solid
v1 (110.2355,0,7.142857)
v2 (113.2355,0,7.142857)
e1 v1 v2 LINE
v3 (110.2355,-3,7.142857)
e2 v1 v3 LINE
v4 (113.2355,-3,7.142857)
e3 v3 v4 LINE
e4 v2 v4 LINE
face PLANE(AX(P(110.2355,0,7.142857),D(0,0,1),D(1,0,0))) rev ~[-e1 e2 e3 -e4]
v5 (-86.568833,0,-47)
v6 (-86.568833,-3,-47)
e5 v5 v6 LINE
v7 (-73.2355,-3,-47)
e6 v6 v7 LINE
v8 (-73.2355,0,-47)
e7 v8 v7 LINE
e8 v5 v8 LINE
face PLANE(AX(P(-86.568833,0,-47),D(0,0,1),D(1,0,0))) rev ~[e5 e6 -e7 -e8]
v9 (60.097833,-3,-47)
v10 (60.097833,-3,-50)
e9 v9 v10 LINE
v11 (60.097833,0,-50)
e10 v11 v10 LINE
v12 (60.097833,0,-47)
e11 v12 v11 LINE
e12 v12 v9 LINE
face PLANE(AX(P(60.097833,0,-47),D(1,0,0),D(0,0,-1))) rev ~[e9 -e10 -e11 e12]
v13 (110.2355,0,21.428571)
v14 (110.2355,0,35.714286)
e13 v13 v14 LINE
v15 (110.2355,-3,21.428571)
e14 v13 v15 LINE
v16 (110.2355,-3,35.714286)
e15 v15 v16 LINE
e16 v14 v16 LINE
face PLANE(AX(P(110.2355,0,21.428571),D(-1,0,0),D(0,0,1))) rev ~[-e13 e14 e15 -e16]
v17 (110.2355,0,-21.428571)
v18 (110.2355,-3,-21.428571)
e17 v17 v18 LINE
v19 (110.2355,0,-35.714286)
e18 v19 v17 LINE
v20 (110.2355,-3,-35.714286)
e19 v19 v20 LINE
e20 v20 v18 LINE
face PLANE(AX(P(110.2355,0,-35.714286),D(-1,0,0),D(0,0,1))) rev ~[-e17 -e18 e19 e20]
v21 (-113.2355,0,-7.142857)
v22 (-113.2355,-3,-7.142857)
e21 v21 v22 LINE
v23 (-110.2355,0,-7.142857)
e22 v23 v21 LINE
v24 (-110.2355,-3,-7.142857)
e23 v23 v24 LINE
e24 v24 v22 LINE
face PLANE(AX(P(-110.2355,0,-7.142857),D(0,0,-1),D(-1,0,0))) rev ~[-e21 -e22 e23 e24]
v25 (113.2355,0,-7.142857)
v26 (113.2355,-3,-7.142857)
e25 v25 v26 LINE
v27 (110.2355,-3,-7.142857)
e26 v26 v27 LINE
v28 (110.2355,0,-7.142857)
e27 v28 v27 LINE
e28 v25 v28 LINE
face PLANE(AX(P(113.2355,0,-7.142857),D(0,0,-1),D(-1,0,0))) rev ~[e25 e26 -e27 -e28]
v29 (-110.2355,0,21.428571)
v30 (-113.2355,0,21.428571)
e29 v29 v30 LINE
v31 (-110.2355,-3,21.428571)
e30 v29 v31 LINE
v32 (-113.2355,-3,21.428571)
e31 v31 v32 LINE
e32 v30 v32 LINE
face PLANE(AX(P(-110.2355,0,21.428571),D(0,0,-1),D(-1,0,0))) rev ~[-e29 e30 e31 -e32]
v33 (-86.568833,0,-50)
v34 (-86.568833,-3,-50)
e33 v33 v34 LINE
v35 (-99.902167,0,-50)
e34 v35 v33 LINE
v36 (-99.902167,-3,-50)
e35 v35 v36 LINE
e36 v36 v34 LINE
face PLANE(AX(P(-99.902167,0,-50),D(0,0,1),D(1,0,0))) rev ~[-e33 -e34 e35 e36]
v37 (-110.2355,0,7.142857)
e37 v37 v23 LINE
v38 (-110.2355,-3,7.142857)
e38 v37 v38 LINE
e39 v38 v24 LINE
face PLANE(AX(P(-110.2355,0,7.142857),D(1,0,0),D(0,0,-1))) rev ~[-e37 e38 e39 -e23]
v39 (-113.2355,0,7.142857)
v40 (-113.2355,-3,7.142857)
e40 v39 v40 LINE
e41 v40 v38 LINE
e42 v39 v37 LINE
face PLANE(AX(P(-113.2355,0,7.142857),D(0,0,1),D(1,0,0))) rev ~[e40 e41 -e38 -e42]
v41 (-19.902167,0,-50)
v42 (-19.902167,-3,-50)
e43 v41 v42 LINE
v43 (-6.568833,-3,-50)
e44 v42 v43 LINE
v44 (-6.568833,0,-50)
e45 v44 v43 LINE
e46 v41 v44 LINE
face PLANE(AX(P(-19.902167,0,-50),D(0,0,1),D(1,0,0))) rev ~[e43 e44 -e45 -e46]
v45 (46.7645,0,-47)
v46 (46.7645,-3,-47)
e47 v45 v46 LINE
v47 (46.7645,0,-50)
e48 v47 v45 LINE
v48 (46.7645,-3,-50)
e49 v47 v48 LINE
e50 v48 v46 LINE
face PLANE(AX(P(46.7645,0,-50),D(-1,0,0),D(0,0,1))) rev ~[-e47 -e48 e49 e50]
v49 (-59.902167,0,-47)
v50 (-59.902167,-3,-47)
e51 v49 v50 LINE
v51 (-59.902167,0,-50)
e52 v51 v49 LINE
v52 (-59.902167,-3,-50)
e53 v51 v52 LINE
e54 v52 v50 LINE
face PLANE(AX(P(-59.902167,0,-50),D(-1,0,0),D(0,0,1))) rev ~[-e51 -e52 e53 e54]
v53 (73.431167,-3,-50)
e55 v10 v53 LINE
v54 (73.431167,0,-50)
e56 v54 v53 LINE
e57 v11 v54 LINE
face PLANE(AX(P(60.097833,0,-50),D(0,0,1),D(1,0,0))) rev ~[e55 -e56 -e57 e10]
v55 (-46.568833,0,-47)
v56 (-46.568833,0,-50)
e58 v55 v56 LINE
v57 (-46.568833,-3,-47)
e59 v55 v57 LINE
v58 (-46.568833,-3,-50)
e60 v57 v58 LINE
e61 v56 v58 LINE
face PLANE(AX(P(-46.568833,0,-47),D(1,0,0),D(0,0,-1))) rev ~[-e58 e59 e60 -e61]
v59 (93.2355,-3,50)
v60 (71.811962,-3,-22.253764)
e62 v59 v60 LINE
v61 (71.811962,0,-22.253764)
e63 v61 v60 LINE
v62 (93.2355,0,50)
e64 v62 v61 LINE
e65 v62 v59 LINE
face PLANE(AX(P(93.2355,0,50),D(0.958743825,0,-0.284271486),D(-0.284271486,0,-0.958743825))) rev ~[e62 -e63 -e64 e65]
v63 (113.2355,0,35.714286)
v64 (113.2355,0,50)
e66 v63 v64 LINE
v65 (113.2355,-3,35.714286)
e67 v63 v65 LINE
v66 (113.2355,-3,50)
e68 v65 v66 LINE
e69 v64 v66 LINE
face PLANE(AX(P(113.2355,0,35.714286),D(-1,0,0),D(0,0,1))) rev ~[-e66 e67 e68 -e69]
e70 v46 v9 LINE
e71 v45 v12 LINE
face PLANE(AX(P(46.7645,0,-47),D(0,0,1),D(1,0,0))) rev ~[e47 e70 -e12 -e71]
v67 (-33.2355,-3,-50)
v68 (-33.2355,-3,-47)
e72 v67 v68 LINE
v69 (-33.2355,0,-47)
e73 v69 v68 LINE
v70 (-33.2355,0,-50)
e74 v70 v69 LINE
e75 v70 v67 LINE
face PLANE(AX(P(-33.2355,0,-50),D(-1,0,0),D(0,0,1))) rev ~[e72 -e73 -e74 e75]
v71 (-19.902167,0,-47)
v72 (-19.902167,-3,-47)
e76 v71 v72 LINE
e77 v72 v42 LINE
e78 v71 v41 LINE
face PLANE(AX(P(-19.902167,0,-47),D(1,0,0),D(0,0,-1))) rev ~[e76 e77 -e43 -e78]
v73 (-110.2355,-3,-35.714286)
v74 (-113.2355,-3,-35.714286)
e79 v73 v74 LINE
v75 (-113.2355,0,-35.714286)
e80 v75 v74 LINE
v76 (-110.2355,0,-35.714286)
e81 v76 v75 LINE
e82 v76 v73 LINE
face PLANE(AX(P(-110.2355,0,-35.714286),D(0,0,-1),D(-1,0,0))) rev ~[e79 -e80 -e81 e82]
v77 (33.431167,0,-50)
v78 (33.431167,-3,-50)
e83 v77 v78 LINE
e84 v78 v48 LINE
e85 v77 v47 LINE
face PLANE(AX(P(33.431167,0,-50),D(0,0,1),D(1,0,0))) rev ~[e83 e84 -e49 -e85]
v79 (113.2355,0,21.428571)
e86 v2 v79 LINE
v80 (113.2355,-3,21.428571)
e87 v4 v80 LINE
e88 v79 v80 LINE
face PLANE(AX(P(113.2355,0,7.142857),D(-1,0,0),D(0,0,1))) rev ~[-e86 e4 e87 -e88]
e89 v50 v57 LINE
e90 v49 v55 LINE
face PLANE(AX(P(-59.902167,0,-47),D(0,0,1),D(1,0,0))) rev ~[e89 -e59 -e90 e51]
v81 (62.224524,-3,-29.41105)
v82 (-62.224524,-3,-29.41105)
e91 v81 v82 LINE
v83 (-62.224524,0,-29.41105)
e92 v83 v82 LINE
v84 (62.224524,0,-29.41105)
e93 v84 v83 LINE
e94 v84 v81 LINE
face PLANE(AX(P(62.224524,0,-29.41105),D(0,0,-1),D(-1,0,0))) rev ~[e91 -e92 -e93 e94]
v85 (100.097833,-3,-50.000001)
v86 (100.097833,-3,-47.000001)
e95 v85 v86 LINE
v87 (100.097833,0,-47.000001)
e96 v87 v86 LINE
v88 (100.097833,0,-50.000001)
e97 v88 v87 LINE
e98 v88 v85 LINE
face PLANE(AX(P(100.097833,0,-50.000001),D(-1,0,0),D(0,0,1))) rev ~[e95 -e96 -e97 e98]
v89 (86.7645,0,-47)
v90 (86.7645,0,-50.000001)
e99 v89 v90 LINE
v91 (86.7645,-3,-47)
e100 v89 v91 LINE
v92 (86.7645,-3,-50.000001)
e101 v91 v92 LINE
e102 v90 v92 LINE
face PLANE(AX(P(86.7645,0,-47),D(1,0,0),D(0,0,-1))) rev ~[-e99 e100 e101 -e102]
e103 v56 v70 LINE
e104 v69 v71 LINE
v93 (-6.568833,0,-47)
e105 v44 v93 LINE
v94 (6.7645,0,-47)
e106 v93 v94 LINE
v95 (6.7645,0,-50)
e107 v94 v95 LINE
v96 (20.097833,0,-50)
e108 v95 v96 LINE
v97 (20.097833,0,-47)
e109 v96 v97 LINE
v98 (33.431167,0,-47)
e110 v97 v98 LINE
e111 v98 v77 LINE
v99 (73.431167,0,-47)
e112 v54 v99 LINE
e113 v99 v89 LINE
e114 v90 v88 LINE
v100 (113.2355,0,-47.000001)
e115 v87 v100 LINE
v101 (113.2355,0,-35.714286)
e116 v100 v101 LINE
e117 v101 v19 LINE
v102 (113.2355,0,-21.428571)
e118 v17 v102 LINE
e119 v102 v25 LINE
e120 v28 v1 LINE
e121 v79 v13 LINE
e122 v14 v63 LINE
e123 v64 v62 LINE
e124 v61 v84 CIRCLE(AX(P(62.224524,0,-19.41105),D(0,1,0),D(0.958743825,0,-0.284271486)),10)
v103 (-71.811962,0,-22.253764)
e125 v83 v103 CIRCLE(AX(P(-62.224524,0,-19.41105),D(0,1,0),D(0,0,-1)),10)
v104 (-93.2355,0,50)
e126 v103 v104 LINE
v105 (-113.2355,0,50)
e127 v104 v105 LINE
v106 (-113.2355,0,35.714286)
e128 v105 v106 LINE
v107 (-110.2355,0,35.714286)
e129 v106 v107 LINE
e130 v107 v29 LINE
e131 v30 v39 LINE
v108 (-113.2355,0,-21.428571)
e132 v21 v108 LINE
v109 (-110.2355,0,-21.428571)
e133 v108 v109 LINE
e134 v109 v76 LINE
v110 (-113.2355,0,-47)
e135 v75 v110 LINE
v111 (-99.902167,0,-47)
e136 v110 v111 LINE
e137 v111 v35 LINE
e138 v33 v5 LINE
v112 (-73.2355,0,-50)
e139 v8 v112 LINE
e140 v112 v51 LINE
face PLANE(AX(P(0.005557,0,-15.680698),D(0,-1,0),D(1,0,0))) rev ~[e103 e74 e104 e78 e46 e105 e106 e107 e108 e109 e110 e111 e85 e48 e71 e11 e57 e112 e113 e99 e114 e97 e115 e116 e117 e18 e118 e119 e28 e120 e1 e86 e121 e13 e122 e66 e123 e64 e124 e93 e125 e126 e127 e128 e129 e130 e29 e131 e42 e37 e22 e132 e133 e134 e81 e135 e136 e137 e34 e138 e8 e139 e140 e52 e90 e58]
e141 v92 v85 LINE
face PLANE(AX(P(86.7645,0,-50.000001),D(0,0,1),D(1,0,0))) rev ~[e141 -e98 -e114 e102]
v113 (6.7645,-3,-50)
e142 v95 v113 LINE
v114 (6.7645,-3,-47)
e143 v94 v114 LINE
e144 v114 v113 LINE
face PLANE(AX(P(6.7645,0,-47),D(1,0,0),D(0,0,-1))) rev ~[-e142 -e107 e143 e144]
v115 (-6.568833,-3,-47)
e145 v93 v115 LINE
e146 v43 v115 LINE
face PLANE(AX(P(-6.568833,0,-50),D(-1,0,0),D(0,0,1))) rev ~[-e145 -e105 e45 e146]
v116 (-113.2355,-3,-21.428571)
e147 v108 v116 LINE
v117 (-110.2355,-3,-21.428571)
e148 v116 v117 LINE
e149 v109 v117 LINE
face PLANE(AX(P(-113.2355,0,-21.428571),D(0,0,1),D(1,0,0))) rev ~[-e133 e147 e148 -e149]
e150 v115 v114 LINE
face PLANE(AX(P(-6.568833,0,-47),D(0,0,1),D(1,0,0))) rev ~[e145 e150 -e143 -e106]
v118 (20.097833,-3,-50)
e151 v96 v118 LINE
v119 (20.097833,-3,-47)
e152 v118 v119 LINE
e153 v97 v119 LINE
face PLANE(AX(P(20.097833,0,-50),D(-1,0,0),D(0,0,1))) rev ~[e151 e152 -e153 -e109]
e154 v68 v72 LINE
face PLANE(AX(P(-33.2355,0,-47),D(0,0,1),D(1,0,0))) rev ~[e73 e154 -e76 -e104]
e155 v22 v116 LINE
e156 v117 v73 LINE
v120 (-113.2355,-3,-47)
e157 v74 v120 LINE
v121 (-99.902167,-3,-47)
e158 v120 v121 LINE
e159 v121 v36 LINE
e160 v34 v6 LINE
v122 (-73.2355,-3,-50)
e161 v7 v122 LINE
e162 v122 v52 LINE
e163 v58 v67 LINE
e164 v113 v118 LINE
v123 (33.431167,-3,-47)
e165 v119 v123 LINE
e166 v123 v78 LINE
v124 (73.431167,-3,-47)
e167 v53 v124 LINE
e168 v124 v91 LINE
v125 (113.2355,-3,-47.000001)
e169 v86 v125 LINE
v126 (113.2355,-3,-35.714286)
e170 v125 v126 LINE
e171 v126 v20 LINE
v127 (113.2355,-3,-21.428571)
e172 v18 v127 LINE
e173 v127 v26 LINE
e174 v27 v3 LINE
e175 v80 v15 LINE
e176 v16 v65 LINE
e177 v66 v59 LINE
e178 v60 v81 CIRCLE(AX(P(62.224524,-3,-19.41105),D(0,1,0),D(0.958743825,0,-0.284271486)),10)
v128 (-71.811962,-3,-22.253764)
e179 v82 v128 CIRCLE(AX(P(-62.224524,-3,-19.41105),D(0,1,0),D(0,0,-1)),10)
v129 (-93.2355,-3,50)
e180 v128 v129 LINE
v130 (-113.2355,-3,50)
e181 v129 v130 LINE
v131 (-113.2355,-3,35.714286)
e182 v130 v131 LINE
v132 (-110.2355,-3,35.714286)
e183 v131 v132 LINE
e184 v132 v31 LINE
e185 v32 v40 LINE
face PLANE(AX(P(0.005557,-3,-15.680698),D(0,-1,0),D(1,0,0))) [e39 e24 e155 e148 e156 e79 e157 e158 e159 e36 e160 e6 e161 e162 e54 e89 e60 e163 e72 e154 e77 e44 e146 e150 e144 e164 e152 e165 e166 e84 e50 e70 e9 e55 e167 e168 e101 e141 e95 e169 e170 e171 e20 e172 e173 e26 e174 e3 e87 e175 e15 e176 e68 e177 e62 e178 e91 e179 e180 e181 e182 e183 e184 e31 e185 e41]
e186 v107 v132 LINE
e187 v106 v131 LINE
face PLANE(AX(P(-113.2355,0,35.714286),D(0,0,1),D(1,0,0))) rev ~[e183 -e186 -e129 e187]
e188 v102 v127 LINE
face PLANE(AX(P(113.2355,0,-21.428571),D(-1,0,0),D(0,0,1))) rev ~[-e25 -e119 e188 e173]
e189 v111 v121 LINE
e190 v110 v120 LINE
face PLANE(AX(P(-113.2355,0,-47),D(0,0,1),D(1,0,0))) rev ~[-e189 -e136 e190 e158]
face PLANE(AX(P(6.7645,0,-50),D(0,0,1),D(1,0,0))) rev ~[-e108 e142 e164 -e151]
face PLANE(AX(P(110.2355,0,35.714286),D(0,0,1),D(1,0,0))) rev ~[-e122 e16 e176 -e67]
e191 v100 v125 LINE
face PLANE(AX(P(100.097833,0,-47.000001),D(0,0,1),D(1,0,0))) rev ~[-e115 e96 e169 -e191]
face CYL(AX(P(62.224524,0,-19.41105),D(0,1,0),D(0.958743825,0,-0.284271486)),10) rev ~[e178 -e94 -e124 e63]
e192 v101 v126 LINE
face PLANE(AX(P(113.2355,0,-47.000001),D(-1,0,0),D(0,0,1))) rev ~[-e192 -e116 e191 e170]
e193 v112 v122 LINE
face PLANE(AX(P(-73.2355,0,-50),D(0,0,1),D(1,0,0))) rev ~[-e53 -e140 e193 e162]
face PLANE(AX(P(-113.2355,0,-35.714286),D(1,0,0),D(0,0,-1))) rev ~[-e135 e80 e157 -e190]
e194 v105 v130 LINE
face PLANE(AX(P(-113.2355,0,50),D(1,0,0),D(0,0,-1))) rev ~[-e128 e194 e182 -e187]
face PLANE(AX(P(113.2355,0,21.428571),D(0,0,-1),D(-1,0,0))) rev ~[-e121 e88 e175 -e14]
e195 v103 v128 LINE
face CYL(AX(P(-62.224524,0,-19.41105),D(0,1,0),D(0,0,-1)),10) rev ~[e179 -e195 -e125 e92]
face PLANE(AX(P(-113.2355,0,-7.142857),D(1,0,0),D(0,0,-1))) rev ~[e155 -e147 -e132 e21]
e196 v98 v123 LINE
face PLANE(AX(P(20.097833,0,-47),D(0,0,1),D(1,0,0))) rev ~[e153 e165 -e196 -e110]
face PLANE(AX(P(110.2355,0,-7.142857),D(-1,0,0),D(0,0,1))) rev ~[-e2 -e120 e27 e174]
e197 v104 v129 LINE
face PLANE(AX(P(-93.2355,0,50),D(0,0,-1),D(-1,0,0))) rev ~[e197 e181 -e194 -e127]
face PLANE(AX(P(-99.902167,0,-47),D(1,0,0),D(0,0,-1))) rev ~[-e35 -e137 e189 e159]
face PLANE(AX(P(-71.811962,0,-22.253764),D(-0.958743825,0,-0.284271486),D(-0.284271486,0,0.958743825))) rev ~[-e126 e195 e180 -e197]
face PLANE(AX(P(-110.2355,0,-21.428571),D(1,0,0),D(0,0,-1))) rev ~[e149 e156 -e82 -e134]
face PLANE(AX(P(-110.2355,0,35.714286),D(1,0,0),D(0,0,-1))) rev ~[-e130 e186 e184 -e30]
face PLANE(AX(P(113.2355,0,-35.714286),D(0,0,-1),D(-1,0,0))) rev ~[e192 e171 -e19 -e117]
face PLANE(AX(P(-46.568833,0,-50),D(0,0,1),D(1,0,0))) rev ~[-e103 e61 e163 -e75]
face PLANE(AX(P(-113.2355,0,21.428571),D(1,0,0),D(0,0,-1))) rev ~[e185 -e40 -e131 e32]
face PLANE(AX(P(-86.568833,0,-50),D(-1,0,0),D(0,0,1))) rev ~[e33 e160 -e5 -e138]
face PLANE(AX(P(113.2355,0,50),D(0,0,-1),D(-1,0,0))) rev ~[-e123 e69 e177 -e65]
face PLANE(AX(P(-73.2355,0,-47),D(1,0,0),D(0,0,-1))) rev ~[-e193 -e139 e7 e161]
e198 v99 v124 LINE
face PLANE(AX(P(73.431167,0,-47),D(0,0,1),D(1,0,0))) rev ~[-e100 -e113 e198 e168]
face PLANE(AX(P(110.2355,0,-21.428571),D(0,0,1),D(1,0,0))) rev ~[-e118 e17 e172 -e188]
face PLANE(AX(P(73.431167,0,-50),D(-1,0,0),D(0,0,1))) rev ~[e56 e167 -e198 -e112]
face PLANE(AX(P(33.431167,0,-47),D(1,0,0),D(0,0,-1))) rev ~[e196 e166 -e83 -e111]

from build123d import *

# Parameters (mm, degrees)
F1_DEPTH = 3


# Not quite as in the source:
# - ends of sketch curves that miss each other by under 0.0002 mm in the source are joined


with BuildPart() as f1:
    # F0 (on Front) → F1 (new body)
    with BuildSketch(Plane.XZ):
        with BuildLine():
            Line((60.097833329, -50), (73.431166662, -50))
            Line((73.431166662, -50), (73.431166662, -47))
            Line((73.431166662, -47), (86.7645, -47))
            Line((86.7645, -47), (86.7645, -50.0000007451))
            Line((86.7645, -50.0000007451), (100.097833333, -50.0000007451))
            Line((100.097833333, -50.0000007451), (100.097833333, -47.0000007451))
            Line((100.097833333, -47.0000007451), (113.2355, -47.0000007451))
            Line((113.2355, -47.0000007451), (113.2355, -35.714285716))
            Line((113.2355, -35.714285716), (110.2355, -35.714285716))
            Line((110.2355, -35.714285716), (110.2355, -21.42857143))
            Line((110.2355, -21.42857143), (113.2355, -21.42857143))
            Line((113.2355, -21.42857143), (113.2355, -7.142857144))
            Line((113.2355, -7.142857144), (110.2355, -7.142857144))
            Line((110.2355, -7.142857144), (110.2355, 7.142857142))
            Line((110.2355, 7.142857142), (113.2355, 7.142857142))
            Line((113.2355, 7.142857142), (113.2355, 21.428571428))
            Line((113.2355, 21.428571428), (110.2355, 21.428571428))
            Line((110.2355, 21.428571428), (110.2355, 35.714285714))
            Line((110.2355, 35.714285714), (113.2355, 35.714285714))
            Line((113.2355, 35.714285714), (113.2355, 50))
            Line((113.2355, 50), (93.2355, 50))
            Line((93.2355, 50), (71.8119617716, -22.2537644208))
            ThreePointArc((71.8119617716, -22.2537644208), (68.2066991862, -27.4243868361), (62.2245235205, -29.4110495597))
            Line((62.2245235205, -29.4110495597), (0, -29.4110495597))
            Line((0, -29.4110495597), (-62.2245235205, -29.4110495597))
            ThreePointArc((-62.2245235205, -29.4110495597), (-68.2066991862, -27.4243868361), (-71.8119617716, -22.2537644208))
            Line((-71.8119617716, -22.2537644208), (-93.2355, 50))
            Line((-93.2355, 50), (-113.2355, 50))
            Line((-113.2355, 50), (-113.2355, 35.714285714))
            Line((-113.2355, 35.714285714), (-110.2355, 35.714285714))
            Line((-110.2355, 35.714285714), (-110.2355, 21.428571428))
            Line((-110.2355, 21.428571428), (-113.2355, 21.428571428))
            Line((-113.2355, 21.428571428), (-113.2355, 7.142857142))
            Line((-113.2355, 7.142857142), (-110.2355, 7.142857142))
            Line((-110.2355, 7.142857142), (-110.2355, -7.142857144))
            Line((-110.2355, -7.142857144), (-113.2355, -7.142857144))
            Line((-113.2355, -7.142857144), (-113.2355, -21.42857143))
            Line((-113.2355, -21.42857143), (-110.2355, -21.42857143))
            Line((-110.2355, -21.42857143), (-110.2355, -35.714285716))
            Line((-110.2355, -35.714285716), (-113.2355, -35.714285716))
            Line((-113.2355, -35.714285716), (-113.2355, -47))
            Line((-113.2355, -47), (-99.902166667, -47))
            Line((-99.902166667, -47), (-99.902166667, -50))
            Line((-99.902166667, -50), (-86.568833334, -50))
            Line((-86.568833334, -50), (-86.568833334, -47))
            Line((-86.568833334, -47), (-73.235500001, -47))
            Line((-73.235500001, -47), (-73.235500001, -50))
            Line((-73.235500001, -50), (-59.902166668, -50))
            Line((-59.902166668, -50), (-59.902166668, -47))
            Line((-59.902166668, -47), (-46.568833335, -47))
            Line((-46.568833335, -47), (-46.568833335, -50))
            Line((-46.568833335, -50), (-33.235500002, -50))
            Line((-33.235500002, -50), (-33.235500002, -47))
            Line((-33.235500002, -47), (-19.902166669, -47))
            Line((-19.902166669, -47), (-19.902166669, -50))
            Line((-19.902166669, -50), (-6.568833336, -50))
            Line((-6.568833336, -50), (-6.568833336, -47))
            Line((-6.568833336, -47), (6.764499997, -47))
            Line((6.764499997, -47), (6.764499997, -50))
            Line((6.764499997, -50), (20.09783333, -50))
            Line((20.09783333, -50), (20.09783333, -47))
            Line((20.09783333, -47), (33.431166663, -47))
            Line((33.431166663, -47), (33.431166663, -50))
            Line((33.431166663, -50), (46.764499996, -50))
            Line((46.764499996, -50), (46.764499996, -47))
            Line((46.764499996, -47), (60.097833329, -47))
            Line((60.097833329, -47), (60.097833329, -50))
        make_face()
    extrude(amount=F1_DEPTH)


solid = f1.part
